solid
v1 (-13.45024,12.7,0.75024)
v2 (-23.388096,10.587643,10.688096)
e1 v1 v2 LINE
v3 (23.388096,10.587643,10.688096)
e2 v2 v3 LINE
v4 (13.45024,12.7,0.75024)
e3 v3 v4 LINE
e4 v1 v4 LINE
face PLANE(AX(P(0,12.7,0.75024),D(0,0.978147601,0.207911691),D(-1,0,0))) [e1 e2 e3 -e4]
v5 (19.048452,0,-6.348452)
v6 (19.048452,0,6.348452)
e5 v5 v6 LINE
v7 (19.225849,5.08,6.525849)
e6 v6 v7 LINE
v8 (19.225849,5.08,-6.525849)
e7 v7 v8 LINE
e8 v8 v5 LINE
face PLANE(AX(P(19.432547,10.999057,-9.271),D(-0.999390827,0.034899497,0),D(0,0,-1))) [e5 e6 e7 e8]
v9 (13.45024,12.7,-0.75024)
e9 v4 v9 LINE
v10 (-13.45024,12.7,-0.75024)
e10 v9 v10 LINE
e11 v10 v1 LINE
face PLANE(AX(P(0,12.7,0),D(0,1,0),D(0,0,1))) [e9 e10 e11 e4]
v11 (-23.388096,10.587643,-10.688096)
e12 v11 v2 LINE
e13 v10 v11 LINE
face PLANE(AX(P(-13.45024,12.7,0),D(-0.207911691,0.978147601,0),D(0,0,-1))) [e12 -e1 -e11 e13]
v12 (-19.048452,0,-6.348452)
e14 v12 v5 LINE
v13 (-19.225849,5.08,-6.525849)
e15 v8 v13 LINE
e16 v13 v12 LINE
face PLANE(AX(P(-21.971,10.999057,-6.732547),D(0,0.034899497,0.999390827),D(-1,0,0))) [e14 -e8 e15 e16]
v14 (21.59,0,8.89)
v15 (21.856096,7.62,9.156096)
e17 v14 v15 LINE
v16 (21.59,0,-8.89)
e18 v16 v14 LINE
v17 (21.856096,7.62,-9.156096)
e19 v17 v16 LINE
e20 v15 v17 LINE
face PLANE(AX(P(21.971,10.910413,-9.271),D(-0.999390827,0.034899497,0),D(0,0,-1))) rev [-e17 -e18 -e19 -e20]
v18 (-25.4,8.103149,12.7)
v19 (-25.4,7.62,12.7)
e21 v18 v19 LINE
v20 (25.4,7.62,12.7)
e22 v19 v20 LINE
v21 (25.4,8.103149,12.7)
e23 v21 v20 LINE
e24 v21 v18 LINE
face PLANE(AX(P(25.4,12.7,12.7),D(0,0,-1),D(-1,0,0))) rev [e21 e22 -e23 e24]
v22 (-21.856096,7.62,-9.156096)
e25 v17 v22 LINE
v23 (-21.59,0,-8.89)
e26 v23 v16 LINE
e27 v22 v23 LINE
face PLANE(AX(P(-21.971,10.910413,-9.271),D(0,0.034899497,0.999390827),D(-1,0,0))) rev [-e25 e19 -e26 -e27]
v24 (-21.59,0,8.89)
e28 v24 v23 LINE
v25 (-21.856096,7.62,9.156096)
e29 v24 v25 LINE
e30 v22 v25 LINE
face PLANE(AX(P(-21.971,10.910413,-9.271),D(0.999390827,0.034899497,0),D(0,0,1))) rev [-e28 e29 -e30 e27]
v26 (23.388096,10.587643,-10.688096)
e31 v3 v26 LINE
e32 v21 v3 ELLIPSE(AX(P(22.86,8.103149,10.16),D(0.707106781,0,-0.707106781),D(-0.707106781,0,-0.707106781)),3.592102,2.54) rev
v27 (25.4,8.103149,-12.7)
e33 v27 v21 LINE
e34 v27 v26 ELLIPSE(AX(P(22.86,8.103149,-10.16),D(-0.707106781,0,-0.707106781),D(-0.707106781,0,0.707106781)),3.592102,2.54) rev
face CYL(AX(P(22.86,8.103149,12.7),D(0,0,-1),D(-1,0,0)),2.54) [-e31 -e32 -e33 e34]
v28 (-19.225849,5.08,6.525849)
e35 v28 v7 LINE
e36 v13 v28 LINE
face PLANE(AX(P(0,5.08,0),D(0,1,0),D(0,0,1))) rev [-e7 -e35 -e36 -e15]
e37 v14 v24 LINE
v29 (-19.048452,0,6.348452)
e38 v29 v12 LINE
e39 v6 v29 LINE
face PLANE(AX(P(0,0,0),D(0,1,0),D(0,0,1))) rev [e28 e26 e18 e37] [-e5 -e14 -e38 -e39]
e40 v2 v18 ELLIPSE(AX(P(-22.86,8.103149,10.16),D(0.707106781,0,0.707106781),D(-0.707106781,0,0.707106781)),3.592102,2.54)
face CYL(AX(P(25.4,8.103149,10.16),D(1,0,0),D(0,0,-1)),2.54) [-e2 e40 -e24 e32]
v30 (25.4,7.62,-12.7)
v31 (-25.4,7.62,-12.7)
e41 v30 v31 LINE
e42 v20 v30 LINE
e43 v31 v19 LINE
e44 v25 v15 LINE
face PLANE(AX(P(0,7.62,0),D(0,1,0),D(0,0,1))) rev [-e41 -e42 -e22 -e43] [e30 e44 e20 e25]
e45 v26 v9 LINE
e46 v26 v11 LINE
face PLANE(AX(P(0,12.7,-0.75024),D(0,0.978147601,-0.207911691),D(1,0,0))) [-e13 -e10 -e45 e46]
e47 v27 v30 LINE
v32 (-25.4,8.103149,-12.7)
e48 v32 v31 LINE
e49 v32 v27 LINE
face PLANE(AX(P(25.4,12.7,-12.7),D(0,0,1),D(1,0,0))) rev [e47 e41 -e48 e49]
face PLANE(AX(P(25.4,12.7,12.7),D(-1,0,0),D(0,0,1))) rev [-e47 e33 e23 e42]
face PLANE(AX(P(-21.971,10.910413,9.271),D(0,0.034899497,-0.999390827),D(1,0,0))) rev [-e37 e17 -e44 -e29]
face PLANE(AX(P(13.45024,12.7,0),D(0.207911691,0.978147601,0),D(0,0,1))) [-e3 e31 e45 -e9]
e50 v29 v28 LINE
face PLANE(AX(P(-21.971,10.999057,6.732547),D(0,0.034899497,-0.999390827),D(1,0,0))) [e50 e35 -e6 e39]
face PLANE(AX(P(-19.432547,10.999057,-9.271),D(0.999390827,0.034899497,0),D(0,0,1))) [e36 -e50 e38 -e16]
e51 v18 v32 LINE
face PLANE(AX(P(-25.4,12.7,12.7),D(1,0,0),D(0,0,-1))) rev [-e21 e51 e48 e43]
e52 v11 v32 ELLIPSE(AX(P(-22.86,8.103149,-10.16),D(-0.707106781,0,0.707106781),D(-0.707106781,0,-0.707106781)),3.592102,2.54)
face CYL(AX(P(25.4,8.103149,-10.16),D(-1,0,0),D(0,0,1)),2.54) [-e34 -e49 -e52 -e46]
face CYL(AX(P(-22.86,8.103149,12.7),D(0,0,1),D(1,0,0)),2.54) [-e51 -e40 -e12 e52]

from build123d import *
from OCP.BRepFilletAPI import BRepFilletAPI_MakeChamfer

# Parameters (mm, degrees)
SKETCH1_W           = 43.942
SKETCH1_H           = 18.542
BOSS_EXTRUDE1_DEPTH = 7.62
CHAMFER1_SIZE       = 10.910412501
CHAMFER1_SIZE_2     = 0.381
SHELL1_T            = -2.54
SKETCH2_W           = 50.8
SKETCH2_H           = 25.4
BOSS_EXTRUDE2_DEPTH = 5.08
CHAMFER2_SIZE       = 2.54
CHAMFER2_SIZE2      = 11.949760478
FILLET1_R           = 2.54


with BuildPart() as part:
    # Sketch1 → Boss-Extrude1 (new body)
    with BuildSketch(Plane(origin=(0, 0, 0), x_dir=(1, 0, 0), z_dir=(0, 1, 0))):
        Rectangle(SKETCH1_W, SKETCH1_H)
    extrude(amount=BOSS_EXTRUDE1_DEPTH)

    # Chamfer1
    # the kernel refuses this chamfer: 10.910412501, 0.381 mm, written as the material it takes off along each edge
    with BuildSketch(Plane(origin=(-21.971, 0, 37.637433425), x_dir=(-0.0013423185755923317, 0.999999099090015, 0), z_dir=(0, 0, -1)), Plane(origin=(21.971, 0, -37.637433425), x_dir=(0.0013423185755923317, 0.999999099090015, 0), z_dir=(0, 0, 1))) as chamfer1_piece_1:
        Polygon((CHAMFER1_SIZE * 0.999999099071, CHAMFER1_SIZE * 0.00134231857557), (-CHAMFER1_SIZE_2 * 0.00134231857559, CHAMFER1_SIZE_2 * 0.99999909909), (0, 0), align=None)
    extrude(amount=75.27486685, mode=Mode.SUBTRACT)
    with BuildSketch(Plane(origin=(-50.337433425, 0, -9.271), x_dir=(0, 0.999999099090015, -0.0013423185755923317), z_dir=(1, 0, 0)), Plane(origin=(50.337433425, 0, 9.271), x_dir=(0, 0.999999099090015, 0.0013423185755923317), z_dir=(-1, 0, 0))) as chamfer1_piece_2:
        Polygon((CHAMFER1_SIZE * 0.999999099071, CHAMFER1_SIZE * 0.00134231857557), (-CHAMFER1_SIZE_2 * 0.00134231857559, CHAMFER1_SIZE_2 * 0.99999909909), (0, 0), align=None)
    extrude(amount=100.67486685, mode=Mode.SUBTRACT)

    # Shell1
    shell1_openings = [part.faces().sort_by_distance(p)[0] for p in [
        (0, 0, 0),
    ]]
    offset(amount=SHELL1_T, openings=shell1_openings, kind=Kind.INTERSECTION)

    # Sketch2 → Boss-Extrude2 (add)
    with BuildSketch(Plane(origin=(0, 7.62, 0), x_dir=(1, 0, 0), z_dir=(0, 1, 0))):
        Rectangle(SKETCH2_W, SKETCH2_H)
    extrude(amount=BOSS_EXTRUDE2_DEPTH)

    # Chamfer2: one chamfer whose edges measure the first distance from different faces: ONE call of the kernel's chamfer builder (chamfer() names one face for all edges)
    chamfer2_edges_1 = [part.edges().sort_by_distance(p)[0] for p in [
        (-25.4, 12.7, 0),
    ]]
    chamfer2_side_1 = [part.faces().sort_by_distance(p)[0] for p in [
        (-25.4, 10.16, 0),
    ]]
    chamfer2_edges_2 = [part.edges().sort_by_distance(p)[0] for p in [
        (0, 12.7, 12.7),
    ]]
    chamfer2_side_2 = [part.faces().sort_by_distance(p)[0] for p in [
        (0, 10.16, 12.7),
    ]]
    chamfer2_edges_3 = [part.edges().sort_by_distance(p)[0] for p in [
        (25.4, 12.7, 0),
    ]]
    chamfer2_side_3 = [part.faces().sort_by_distance(p)[0] for p in [
        (25.4, 10.16, 0),
    ]]
    chamfer2_edges_4 = [part.edges().sort_by_distance(p)[0] for p in [
        (0, 12.7, -12.7),
    ]]
    chamfer2_side_4 = [part.faces().sort_by_distance(p)[0] for p in [
        (0, 10.16, -12.7),
    ]]
    chamfer2 = BRepFilletAPI_MakeChamfer(part.part.solid().wrapped)
    for e in chamfer2_edges_1:
        chamfer2.Add(CHAMFER2_SIZE, CHAMFER2_SIZE2, e.wrapped, chamfer2_side_1[0].wrapped)  # the first distance lies on this face
    for e in chamfer2_edges_2:
        chamfer2.Add(CHAMFER2_SIZE, CHAMFER2_SIZE2, e.wrapped, chamfer2_side_2[0].wrapped)  # the first distance lies on this face
    for e in chamfer2_edges_3:
        chamfer2.Add(CHAMFER2_SIZE, CHAMFER2_SIZE2, e.wrapped, chamfer2_side_3[0].wrapped)  # the first distance lies on this face
    for e in chamfer2_edges_4:
        chamfer2.Add(CHAMFER2_SIZE, CHAMFER2_SIZE2, e.wrapped, chamfer2_side_4[0].wrapped)  # the first distance lies on this face
    add(Compound.cast(chamfer2.Shape()), mode=Mode.REPLACE)

    # Fillet1
    fillet1_edges = [part.edges().sort_by_distance(p)[0] for p in [
        (0, 10.16, 12.7),
        (-25.4, 10.16, 0),
        (0, 10.16, -12.7),
        (25.4, 10.16, 0),
    ]]
    fillet(fillet1_edges, radius=FILLET1_R)


solid = part.part
